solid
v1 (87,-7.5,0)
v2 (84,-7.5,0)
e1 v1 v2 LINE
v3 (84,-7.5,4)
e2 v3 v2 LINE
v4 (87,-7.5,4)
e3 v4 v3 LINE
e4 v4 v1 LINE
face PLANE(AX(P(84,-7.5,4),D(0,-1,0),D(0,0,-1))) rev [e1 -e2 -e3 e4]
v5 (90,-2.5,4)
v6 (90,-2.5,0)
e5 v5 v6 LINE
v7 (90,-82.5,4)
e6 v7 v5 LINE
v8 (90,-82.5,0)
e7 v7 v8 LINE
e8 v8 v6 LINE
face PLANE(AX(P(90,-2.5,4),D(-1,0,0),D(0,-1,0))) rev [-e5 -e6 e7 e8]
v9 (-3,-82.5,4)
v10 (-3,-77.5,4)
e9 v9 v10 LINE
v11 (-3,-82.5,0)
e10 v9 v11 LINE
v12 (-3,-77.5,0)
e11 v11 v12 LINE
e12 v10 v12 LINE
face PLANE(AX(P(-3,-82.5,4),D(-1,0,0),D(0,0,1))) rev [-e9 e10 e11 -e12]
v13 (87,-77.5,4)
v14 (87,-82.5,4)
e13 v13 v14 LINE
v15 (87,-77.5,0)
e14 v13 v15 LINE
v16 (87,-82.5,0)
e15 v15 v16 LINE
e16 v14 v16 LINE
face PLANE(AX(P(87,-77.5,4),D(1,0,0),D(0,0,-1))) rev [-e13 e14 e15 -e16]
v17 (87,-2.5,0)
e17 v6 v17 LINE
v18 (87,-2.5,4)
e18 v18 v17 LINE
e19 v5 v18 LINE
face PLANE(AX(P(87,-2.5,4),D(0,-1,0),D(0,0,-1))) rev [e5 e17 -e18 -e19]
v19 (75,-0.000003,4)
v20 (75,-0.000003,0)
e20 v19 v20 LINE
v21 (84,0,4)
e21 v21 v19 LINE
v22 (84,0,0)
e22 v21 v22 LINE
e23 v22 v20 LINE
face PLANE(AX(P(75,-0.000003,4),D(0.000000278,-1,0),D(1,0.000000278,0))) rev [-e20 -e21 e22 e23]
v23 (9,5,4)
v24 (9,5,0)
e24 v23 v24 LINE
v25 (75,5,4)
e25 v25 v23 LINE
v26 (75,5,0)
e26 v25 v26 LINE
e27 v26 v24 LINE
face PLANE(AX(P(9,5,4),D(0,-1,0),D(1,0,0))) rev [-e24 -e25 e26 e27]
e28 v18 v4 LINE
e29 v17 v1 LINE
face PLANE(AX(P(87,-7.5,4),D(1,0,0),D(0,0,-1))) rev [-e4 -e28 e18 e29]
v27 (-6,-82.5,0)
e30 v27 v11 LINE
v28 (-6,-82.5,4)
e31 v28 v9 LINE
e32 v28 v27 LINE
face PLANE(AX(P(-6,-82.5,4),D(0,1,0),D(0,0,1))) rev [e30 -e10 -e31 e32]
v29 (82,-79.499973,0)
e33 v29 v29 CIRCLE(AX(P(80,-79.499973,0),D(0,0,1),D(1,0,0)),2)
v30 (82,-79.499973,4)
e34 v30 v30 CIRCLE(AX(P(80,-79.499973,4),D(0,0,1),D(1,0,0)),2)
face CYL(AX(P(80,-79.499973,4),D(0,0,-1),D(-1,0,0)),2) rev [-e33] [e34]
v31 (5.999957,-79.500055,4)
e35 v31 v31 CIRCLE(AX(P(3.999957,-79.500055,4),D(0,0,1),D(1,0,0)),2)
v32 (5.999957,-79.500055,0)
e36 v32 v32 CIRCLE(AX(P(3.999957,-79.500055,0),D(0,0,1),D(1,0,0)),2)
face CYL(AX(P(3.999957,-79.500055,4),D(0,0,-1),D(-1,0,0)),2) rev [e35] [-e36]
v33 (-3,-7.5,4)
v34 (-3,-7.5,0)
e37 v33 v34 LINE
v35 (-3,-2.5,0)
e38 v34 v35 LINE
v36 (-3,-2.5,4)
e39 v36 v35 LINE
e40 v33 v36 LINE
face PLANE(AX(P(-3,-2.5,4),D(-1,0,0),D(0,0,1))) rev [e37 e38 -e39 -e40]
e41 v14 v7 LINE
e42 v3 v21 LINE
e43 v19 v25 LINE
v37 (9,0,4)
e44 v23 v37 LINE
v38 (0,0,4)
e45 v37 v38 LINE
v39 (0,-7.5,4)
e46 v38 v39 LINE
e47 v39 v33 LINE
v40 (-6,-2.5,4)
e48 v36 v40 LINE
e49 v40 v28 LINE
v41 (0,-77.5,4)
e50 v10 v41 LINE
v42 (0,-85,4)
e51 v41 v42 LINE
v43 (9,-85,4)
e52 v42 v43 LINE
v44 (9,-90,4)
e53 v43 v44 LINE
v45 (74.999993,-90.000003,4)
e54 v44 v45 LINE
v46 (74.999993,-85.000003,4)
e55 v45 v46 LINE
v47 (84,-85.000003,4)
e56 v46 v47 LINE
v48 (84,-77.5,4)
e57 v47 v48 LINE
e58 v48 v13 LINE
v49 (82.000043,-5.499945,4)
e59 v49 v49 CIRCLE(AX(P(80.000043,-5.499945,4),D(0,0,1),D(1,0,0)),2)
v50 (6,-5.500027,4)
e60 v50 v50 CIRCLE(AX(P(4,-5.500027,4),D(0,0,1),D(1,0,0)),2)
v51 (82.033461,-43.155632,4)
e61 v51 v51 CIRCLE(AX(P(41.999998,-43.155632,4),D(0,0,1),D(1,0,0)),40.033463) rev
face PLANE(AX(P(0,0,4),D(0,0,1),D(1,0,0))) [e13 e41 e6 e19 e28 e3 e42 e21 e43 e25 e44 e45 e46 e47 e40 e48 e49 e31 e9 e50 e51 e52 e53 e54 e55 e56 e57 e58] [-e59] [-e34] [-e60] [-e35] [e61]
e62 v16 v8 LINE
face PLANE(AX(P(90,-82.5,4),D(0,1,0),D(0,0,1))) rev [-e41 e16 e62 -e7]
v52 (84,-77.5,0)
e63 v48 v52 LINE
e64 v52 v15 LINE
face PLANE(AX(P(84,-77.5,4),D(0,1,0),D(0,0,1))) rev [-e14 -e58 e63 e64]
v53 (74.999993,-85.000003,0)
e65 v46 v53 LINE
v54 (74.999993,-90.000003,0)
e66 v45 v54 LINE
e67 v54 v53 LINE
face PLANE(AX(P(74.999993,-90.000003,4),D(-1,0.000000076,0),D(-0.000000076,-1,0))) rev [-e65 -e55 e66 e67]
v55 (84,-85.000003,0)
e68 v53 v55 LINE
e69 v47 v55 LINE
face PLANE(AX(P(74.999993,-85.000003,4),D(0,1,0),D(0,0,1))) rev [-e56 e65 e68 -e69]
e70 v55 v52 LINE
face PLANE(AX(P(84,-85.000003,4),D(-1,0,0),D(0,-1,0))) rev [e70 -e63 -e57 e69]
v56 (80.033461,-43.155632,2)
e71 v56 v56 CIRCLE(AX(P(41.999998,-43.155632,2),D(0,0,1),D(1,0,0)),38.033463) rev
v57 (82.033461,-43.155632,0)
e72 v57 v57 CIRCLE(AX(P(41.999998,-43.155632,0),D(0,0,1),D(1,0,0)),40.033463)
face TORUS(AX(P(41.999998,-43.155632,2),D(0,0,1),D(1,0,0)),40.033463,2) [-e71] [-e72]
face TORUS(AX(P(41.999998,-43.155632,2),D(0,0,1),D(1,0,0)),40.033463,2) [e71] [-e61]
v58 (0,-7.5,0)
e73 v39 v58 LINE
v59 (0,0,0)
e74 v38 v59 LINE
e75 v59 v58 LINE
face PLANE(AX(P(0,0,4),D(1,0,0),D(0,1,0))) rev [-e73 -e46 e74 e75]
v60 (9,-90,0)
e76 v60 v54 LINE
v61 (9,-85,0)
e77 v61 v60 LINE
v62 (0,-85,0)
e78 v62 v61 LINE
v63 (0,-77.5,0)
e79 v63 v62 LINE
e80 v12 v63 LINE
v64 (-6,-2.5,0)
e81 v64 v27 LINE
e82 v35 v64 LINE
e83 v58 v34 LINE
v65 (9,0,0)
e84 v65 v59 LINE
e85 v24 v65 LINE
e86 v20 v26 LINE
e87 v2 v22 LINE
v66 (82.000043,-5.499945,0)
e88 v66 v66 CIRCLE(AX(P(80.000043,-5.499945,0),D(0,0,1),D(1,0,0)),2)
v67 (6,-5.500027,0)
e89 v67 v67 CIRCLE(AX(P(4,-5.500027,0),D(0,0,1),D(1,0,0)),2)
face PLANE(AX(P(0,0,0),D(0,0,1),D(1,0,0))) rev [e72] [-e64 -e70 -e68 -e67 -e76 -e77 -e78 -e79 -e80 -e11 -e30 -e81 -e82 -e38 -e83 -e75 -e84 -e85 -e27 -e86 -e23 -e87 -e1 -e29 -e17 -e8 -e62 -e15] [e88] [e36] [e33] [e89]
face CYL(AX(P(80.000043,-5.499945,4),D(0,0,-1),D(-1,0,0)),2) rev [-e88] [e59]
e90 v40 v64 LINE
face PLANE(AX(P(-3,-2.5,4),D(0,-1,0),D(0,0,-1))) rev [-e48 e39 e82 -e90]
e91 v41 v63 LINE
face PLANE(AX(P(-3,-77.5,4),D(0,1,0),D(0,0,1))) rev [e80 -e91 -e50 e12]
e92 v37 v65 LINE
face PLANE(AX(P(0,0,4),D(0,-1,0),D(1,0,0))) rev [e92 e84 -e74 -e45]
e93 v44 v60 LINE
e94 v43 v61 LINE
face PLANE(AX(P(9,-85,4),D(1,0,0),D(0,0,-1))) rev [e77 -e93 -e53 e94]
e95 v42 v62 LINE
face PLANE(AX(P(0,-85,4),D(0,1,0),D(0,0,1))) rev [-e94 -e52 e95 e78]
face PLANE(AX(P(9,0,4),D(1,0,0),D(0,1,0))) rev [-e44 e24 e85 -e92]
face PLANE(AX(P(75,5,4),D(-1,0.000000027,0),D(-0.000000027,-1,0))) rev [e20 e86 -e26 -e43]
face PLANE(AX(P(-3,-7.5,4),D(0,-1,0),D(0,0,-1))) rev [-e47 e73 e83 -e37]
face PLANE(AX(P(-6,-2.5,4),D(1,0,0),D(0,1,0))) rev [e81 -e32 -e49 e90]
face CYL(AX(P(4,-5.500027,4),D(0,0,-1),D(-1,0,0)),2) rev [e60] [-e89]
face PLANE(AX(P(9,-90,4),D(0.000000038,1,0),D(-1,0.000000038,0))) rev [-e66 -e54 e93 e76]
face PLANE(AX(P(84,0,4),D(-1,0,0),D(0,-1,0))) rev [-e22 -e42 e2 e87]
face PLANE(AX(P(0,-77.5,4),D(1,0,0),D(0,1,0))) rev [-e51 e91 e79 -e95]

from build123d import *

# Parameters (mm, degrees)
SKETCH1_R           = 2
SKETCH1_R_2         = 38.03346271
BOSS_EXTRUDE1_DEPTH = 4
FILLET1_R           = 2


with BuildPart() as part:
    # Sketch1 → Boss-Extrude1 (new body)
    with BuildSketch(Plane.XY):
        Polygon((0, 0), (9, 0), (9, 5), (75, 5), (74.999999866, -2.502e-06), (84, 0), (84, -7.5), (87, -7.5), (87, -2.5), (90, -2.5), (90, -82.5), (87, -82.5), (87, -77.5), (84, -77.5), (84, -85.000002502), (74.999993421, -85.000002502), (74.999993042, -90.000002502), (9, -90), (9, -85), (0, -85), (0, -77.5), (-3, -77.5), (-3, -82.5), (-6, -82.5), (-6, -2.5), (-3, -2.5), (-3, -7.5), (0, -7.5), align=None)
        with Locations((4, -5.500026536)):
            Circle(SKETCH1_R, mode=Mode.SUBTRACT)
        with Locations((80.000043308, -5.499945424)):
            Circle(SKETCH1_R, mode=Mode.SUBTRACT)
        with Locations((80, -79.499973464)):
            Circle(SKETCH1_R, mode=Mode.SUBTRACT)
        with Locations((3.999956692, -79.500054576)):
            Circle(SKETCH1_R, mode=Mode.SUBTRACT)
        with Locations((41.999998297, -43.155631615)):
            Circle(SKETCH1_R_2, mode=Mode.SUBTRACT)
    extrude(amount=BOSS_EXTRUDE1_DEPTH)

    # Fillet1
    fillet1_edges = [part.edges().sort_by_distance(p)[0] for p in [
        (3.966535587, -43.155631615, 0),
        (3.966535587, -43.155631615, 4),
    ]]
    fillet(fillet1_edges, radius=FILLET1_R - 0.0001)  # a hair under: the kernel refuses the full size


solid = part.part
